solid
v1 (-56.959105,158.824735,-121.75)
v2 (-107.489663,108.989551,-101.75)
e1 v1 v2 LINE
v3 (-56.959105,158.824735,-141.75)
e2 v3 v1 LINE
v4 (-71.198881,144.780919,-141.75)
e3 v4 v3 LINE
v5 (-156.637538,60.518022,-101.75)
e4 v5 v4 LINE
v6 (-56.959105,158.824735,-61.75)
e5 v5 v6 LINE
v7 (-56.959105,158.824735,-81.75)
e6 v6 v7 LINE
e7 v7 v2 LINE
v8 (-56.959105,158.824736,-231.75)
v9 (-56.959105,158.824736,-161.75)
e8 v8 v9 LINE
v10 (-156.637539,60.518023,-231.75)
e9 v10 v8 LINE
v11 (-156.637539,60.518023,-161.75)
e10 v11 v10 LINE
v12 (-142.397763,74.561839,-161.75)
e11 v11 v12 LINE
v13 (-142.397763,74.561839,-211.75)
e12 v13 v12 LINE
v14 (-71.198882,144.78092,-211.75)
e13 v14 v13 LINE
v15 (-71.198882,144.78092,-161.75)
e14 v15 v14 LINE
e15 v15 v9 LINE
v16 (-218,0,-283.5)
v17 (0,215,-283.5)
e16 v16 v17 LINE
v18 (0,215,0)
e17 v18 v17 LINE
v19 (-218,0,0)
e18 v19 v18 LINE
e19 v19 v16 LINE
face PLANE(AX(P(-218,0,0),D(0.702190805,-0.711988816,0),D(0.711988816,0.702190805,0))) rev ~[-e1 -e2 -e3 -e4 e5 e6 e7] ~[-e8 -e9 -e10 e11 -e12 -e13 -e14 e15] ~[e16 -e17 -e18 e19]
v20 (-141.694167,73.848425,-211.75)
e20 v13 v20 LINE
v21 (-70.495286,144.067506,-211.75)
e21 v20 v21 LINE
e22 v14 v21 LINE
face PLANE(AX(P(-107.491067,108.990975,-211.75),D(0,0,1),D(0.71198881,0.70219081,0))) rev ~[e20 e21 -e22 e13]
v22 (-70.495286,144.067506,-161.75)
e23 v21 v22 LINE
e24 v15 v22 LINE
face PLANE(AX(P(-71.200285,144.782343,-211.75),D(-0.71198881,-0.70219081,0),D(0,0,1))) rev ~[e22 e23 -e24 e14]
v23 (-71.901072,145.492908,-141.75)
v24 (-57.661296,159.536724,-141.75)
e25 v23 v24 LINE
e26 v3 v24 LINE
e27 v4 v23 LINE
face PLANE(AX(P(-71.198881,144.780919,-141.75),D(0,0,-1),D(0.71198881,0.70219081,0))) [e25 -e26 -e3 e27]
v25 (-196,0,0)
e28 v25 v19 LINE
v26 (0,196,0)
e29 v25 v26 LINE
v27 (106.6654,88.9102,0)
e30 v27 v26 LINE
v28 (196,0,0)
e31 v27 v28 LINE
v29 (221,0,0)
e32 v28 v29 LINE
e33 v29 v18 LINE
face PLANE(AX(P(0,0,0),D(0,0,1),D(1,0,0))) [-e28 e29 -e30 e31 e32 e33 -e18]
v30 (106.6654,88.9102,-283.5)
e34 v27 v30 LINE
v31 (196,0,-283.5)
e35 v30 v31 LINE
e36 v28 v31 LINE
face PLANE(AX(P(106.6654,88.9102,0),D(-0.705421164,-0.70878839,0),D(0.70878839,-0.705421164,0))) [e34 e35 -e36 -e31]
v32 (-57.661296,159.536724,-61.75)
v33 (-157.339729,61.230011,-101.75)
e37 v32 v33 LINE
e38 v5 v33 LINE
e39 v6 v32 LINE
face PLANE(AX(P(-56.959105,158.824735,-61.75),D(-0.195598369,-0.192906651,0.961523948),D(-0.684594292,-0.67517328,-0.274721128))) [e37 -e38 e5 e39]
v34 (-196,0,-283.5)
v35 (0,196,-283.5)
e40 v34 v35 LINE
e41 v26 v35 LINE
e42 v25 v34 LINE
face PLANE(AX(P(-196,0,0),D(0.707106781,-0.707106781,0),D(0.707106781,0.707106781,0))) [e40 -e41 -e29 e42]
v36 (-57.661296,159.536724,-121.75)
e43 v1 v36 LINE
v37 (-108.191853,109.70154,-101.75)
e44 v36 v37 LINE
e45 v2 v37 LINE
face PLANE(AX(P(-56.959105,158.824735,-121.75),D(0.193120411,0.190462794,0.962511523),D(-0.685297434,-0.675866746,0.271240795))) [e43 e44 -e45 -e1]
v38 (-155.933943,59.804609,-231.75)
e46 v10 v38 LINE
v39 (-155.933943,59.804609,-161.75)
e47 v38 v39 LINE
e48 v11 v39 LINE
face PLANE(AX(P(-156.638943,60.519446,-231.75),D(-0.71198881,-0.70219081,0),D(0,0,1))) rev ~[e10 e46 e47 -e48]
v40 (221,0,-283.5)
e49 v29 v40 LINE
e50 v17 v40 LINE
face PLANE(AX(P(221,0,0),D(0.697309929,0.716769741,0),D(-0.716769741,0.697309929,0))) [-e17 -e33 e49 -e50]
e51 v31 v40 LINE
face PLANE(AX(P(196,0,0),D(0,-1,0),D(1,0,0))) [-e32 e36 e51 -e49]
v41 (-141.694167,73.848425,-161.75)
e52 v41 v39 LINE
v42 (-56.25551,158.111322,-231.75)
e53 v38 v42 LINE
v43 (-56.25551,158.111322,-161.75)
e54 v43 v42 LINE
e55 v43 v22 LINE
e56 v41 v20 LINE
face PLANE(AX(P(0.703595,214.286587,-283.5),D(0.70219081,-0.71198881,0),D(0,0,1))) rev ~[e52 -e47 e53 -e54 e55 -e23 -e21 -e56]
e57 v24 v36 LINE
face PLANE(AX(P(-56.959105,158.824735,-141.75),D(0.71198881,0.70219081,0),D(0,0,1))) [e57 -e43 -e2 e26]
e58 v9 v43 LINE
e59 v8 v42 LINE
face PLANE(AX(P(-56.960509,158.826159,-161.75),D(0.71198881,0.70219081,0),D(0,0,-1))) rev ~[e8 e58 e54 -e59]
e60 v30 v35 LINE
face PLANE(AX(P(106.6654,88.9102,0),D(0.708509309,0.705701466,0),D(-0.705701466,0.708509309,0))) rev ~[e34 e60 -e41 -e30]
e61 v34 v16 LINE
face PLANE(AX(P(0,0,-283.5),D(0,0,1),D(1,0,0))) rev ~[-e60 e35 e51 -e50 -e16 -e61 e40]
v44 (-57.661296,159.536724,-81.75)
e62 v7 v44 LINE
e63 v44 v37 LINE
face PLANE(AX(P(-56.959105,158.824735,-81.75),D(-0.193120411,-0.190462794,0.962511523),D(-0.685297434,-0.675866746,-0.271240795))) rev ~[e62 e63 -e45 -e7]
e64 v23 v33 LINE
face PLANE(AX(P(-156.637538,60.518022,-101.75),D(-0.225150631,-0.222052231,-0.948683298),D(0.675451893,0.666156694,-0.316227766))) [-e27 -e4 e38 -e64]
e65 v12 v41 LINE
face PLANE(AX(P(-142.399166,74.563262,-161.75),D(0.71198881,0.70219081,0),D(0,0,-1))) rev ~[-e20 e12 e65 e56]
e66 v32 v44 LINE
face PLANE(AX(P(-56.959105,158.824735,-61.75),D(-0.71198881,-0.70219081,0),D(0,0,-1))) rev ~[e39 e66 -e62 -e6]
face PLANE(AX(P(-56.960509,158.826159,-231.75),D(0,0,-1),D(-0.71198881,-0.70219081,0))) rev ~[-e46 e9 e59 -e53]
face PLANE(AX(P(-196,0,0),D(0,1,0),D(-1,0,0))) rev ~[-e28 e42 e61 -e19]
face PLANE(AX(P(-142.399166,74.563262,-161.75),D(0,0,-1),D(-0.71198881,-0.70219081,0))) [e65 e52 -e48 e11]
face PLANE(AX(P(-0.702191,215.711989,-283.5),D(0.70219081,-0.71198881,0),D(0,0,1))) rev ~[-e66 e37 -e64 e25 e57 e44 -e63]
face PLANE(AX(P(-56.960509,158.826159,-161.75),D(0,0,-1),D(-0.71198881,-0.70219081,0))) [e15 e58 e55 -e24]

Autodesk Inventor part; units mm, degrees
ref_plane "YZ Plane" through (0, 0, 0) normal (1, 0, 0) x (0, 1, 0)
ref_plane "XZ Plane" through (0, 0, 0) normal (0, 1, 0) x (-1, 0, 0)
sketch "Boceto2" plane through (0, 0, 0) normal (0, 0, 1) x (1, 0, 0)
  line L0 (0, 0) -> (196, 0)
  line L1 (0, 0) -> (-196, 0)
  line L2 (0, 0) -> (0, 215)
  line L3 (-196, 0) -> (-218, 0)
  line L4 (-218, 0) -> (0, 215)
  line L5 (-263.5923, -44.9649) -> (-252.2786, -56.2786)
  line L6 (-263.5923, -44.9649) -> (-247.5923, -44.9649) construction
  line L7 (-252.2786, -56.2786) -> (0, 196)
  line L8 (-252.2786, -56.2786) -> (-196, 0)
  line L9 (196, 0) -> (221, 0)
  line L10 (221, 0) -> (0, 215)
  line L11 (117.9791, 100.2239) -> (106.6654, 88.9102)
  line L12 (117.9791, 100.2239) -> (133.9791, 100.2239) construction
  line L13 (106.6654, 88.9102) -> (0, 196)
  line L14 (106.6654, 88.9102) -> (196, 0)
  dimension "d0" = 196
  dimension "d1" = 196
  dimension "d2" = 215
  dimension "d3" = 22
  dimension "d4" = 16
  dimension "d5" = 45
  dimension "d6" = 25
  dimension "d7" = 16
  dimension "d8" = 135
extrude "Extrusión1" add sketch "Boceto2" against normal blind 283.5 contours L14 L11 L10 L9 | L3 L4 L2 L7 | L2 L10 L11 L13
ref_plane "Plano de trabajo1" through (0, 215, -283.5) normal (0.7021908, -0.7119888, 0) x (0, 0, 1)
sketch "Boceto3" plane through (0, 215, -283.5) normal (0.7021908, -0.7119888, 0) x (0, 0, 1)
  line L0 (283.5, 150.971) -> (0, 150.971)
  line L1 (0, 306.1846) -> (0, 0) projected
  line L2 (283.5, -6.3785) -> (0, -6.3785) projected
  line L3 (141.75, 150.971) -> (141.75, 0)
  line L4 (283.5, 0) -> (0, 0) projected
  line L5 (141.75, 0) -> (141.75, 80)
  line L6 (121.75, 80) -> (51.75, 80)
  line L7 (51.75, 80) -> (51.75, 220)
  line L8 (51.75, 220) -> (121.75, 220)
  line L9 (121.75, 200) -> (71.75, 200)
  line L10 (71.75, 200) -> (71.75, 100)
  line L11 (71.75, 100) -> (121.75, 100)
  line L12 (141.75, 80) -> (161.75, 80)
  line L13 (181.75, 220) -> (141.75, 100)
  line L14 (221.75, 80) -> (181.75, 220)
  line L15 (221.75, 80) -> (201.75, 80)
  line L16 (201.75, 80) -> (181.75, 150.971)
  line L17 (161.75, 80) -> (181.75, 150.971)
  line L18 (141.75, 80) -> (135.0833, 80)
  line L19 (121.75, 80) -> (121.75, 220)
  line L20 (135.0833, 80) -> (142.2633, 101.5399)
  point P0 (141.75, 220)
  point P1 (141.75, 200)
  dimension "d28" = 90
  dimension "d29" = 100
  dimension "d30" = 70
  dimension "d31" = 20
extrude "Extrusión2" cut sketch "Boceto3" along normal blind 1 contours L10 L11 L19 L6 L7 L0 | L0 L7 L8 L19 L9 L10
extrude "Extrusión3" add sketch "Boceto3" against normal blind 1 contours L14 L15 L16 L0 | L0 L13 L14 | L17 L12 L3 L13 L0
properties part number "TABLERO"
